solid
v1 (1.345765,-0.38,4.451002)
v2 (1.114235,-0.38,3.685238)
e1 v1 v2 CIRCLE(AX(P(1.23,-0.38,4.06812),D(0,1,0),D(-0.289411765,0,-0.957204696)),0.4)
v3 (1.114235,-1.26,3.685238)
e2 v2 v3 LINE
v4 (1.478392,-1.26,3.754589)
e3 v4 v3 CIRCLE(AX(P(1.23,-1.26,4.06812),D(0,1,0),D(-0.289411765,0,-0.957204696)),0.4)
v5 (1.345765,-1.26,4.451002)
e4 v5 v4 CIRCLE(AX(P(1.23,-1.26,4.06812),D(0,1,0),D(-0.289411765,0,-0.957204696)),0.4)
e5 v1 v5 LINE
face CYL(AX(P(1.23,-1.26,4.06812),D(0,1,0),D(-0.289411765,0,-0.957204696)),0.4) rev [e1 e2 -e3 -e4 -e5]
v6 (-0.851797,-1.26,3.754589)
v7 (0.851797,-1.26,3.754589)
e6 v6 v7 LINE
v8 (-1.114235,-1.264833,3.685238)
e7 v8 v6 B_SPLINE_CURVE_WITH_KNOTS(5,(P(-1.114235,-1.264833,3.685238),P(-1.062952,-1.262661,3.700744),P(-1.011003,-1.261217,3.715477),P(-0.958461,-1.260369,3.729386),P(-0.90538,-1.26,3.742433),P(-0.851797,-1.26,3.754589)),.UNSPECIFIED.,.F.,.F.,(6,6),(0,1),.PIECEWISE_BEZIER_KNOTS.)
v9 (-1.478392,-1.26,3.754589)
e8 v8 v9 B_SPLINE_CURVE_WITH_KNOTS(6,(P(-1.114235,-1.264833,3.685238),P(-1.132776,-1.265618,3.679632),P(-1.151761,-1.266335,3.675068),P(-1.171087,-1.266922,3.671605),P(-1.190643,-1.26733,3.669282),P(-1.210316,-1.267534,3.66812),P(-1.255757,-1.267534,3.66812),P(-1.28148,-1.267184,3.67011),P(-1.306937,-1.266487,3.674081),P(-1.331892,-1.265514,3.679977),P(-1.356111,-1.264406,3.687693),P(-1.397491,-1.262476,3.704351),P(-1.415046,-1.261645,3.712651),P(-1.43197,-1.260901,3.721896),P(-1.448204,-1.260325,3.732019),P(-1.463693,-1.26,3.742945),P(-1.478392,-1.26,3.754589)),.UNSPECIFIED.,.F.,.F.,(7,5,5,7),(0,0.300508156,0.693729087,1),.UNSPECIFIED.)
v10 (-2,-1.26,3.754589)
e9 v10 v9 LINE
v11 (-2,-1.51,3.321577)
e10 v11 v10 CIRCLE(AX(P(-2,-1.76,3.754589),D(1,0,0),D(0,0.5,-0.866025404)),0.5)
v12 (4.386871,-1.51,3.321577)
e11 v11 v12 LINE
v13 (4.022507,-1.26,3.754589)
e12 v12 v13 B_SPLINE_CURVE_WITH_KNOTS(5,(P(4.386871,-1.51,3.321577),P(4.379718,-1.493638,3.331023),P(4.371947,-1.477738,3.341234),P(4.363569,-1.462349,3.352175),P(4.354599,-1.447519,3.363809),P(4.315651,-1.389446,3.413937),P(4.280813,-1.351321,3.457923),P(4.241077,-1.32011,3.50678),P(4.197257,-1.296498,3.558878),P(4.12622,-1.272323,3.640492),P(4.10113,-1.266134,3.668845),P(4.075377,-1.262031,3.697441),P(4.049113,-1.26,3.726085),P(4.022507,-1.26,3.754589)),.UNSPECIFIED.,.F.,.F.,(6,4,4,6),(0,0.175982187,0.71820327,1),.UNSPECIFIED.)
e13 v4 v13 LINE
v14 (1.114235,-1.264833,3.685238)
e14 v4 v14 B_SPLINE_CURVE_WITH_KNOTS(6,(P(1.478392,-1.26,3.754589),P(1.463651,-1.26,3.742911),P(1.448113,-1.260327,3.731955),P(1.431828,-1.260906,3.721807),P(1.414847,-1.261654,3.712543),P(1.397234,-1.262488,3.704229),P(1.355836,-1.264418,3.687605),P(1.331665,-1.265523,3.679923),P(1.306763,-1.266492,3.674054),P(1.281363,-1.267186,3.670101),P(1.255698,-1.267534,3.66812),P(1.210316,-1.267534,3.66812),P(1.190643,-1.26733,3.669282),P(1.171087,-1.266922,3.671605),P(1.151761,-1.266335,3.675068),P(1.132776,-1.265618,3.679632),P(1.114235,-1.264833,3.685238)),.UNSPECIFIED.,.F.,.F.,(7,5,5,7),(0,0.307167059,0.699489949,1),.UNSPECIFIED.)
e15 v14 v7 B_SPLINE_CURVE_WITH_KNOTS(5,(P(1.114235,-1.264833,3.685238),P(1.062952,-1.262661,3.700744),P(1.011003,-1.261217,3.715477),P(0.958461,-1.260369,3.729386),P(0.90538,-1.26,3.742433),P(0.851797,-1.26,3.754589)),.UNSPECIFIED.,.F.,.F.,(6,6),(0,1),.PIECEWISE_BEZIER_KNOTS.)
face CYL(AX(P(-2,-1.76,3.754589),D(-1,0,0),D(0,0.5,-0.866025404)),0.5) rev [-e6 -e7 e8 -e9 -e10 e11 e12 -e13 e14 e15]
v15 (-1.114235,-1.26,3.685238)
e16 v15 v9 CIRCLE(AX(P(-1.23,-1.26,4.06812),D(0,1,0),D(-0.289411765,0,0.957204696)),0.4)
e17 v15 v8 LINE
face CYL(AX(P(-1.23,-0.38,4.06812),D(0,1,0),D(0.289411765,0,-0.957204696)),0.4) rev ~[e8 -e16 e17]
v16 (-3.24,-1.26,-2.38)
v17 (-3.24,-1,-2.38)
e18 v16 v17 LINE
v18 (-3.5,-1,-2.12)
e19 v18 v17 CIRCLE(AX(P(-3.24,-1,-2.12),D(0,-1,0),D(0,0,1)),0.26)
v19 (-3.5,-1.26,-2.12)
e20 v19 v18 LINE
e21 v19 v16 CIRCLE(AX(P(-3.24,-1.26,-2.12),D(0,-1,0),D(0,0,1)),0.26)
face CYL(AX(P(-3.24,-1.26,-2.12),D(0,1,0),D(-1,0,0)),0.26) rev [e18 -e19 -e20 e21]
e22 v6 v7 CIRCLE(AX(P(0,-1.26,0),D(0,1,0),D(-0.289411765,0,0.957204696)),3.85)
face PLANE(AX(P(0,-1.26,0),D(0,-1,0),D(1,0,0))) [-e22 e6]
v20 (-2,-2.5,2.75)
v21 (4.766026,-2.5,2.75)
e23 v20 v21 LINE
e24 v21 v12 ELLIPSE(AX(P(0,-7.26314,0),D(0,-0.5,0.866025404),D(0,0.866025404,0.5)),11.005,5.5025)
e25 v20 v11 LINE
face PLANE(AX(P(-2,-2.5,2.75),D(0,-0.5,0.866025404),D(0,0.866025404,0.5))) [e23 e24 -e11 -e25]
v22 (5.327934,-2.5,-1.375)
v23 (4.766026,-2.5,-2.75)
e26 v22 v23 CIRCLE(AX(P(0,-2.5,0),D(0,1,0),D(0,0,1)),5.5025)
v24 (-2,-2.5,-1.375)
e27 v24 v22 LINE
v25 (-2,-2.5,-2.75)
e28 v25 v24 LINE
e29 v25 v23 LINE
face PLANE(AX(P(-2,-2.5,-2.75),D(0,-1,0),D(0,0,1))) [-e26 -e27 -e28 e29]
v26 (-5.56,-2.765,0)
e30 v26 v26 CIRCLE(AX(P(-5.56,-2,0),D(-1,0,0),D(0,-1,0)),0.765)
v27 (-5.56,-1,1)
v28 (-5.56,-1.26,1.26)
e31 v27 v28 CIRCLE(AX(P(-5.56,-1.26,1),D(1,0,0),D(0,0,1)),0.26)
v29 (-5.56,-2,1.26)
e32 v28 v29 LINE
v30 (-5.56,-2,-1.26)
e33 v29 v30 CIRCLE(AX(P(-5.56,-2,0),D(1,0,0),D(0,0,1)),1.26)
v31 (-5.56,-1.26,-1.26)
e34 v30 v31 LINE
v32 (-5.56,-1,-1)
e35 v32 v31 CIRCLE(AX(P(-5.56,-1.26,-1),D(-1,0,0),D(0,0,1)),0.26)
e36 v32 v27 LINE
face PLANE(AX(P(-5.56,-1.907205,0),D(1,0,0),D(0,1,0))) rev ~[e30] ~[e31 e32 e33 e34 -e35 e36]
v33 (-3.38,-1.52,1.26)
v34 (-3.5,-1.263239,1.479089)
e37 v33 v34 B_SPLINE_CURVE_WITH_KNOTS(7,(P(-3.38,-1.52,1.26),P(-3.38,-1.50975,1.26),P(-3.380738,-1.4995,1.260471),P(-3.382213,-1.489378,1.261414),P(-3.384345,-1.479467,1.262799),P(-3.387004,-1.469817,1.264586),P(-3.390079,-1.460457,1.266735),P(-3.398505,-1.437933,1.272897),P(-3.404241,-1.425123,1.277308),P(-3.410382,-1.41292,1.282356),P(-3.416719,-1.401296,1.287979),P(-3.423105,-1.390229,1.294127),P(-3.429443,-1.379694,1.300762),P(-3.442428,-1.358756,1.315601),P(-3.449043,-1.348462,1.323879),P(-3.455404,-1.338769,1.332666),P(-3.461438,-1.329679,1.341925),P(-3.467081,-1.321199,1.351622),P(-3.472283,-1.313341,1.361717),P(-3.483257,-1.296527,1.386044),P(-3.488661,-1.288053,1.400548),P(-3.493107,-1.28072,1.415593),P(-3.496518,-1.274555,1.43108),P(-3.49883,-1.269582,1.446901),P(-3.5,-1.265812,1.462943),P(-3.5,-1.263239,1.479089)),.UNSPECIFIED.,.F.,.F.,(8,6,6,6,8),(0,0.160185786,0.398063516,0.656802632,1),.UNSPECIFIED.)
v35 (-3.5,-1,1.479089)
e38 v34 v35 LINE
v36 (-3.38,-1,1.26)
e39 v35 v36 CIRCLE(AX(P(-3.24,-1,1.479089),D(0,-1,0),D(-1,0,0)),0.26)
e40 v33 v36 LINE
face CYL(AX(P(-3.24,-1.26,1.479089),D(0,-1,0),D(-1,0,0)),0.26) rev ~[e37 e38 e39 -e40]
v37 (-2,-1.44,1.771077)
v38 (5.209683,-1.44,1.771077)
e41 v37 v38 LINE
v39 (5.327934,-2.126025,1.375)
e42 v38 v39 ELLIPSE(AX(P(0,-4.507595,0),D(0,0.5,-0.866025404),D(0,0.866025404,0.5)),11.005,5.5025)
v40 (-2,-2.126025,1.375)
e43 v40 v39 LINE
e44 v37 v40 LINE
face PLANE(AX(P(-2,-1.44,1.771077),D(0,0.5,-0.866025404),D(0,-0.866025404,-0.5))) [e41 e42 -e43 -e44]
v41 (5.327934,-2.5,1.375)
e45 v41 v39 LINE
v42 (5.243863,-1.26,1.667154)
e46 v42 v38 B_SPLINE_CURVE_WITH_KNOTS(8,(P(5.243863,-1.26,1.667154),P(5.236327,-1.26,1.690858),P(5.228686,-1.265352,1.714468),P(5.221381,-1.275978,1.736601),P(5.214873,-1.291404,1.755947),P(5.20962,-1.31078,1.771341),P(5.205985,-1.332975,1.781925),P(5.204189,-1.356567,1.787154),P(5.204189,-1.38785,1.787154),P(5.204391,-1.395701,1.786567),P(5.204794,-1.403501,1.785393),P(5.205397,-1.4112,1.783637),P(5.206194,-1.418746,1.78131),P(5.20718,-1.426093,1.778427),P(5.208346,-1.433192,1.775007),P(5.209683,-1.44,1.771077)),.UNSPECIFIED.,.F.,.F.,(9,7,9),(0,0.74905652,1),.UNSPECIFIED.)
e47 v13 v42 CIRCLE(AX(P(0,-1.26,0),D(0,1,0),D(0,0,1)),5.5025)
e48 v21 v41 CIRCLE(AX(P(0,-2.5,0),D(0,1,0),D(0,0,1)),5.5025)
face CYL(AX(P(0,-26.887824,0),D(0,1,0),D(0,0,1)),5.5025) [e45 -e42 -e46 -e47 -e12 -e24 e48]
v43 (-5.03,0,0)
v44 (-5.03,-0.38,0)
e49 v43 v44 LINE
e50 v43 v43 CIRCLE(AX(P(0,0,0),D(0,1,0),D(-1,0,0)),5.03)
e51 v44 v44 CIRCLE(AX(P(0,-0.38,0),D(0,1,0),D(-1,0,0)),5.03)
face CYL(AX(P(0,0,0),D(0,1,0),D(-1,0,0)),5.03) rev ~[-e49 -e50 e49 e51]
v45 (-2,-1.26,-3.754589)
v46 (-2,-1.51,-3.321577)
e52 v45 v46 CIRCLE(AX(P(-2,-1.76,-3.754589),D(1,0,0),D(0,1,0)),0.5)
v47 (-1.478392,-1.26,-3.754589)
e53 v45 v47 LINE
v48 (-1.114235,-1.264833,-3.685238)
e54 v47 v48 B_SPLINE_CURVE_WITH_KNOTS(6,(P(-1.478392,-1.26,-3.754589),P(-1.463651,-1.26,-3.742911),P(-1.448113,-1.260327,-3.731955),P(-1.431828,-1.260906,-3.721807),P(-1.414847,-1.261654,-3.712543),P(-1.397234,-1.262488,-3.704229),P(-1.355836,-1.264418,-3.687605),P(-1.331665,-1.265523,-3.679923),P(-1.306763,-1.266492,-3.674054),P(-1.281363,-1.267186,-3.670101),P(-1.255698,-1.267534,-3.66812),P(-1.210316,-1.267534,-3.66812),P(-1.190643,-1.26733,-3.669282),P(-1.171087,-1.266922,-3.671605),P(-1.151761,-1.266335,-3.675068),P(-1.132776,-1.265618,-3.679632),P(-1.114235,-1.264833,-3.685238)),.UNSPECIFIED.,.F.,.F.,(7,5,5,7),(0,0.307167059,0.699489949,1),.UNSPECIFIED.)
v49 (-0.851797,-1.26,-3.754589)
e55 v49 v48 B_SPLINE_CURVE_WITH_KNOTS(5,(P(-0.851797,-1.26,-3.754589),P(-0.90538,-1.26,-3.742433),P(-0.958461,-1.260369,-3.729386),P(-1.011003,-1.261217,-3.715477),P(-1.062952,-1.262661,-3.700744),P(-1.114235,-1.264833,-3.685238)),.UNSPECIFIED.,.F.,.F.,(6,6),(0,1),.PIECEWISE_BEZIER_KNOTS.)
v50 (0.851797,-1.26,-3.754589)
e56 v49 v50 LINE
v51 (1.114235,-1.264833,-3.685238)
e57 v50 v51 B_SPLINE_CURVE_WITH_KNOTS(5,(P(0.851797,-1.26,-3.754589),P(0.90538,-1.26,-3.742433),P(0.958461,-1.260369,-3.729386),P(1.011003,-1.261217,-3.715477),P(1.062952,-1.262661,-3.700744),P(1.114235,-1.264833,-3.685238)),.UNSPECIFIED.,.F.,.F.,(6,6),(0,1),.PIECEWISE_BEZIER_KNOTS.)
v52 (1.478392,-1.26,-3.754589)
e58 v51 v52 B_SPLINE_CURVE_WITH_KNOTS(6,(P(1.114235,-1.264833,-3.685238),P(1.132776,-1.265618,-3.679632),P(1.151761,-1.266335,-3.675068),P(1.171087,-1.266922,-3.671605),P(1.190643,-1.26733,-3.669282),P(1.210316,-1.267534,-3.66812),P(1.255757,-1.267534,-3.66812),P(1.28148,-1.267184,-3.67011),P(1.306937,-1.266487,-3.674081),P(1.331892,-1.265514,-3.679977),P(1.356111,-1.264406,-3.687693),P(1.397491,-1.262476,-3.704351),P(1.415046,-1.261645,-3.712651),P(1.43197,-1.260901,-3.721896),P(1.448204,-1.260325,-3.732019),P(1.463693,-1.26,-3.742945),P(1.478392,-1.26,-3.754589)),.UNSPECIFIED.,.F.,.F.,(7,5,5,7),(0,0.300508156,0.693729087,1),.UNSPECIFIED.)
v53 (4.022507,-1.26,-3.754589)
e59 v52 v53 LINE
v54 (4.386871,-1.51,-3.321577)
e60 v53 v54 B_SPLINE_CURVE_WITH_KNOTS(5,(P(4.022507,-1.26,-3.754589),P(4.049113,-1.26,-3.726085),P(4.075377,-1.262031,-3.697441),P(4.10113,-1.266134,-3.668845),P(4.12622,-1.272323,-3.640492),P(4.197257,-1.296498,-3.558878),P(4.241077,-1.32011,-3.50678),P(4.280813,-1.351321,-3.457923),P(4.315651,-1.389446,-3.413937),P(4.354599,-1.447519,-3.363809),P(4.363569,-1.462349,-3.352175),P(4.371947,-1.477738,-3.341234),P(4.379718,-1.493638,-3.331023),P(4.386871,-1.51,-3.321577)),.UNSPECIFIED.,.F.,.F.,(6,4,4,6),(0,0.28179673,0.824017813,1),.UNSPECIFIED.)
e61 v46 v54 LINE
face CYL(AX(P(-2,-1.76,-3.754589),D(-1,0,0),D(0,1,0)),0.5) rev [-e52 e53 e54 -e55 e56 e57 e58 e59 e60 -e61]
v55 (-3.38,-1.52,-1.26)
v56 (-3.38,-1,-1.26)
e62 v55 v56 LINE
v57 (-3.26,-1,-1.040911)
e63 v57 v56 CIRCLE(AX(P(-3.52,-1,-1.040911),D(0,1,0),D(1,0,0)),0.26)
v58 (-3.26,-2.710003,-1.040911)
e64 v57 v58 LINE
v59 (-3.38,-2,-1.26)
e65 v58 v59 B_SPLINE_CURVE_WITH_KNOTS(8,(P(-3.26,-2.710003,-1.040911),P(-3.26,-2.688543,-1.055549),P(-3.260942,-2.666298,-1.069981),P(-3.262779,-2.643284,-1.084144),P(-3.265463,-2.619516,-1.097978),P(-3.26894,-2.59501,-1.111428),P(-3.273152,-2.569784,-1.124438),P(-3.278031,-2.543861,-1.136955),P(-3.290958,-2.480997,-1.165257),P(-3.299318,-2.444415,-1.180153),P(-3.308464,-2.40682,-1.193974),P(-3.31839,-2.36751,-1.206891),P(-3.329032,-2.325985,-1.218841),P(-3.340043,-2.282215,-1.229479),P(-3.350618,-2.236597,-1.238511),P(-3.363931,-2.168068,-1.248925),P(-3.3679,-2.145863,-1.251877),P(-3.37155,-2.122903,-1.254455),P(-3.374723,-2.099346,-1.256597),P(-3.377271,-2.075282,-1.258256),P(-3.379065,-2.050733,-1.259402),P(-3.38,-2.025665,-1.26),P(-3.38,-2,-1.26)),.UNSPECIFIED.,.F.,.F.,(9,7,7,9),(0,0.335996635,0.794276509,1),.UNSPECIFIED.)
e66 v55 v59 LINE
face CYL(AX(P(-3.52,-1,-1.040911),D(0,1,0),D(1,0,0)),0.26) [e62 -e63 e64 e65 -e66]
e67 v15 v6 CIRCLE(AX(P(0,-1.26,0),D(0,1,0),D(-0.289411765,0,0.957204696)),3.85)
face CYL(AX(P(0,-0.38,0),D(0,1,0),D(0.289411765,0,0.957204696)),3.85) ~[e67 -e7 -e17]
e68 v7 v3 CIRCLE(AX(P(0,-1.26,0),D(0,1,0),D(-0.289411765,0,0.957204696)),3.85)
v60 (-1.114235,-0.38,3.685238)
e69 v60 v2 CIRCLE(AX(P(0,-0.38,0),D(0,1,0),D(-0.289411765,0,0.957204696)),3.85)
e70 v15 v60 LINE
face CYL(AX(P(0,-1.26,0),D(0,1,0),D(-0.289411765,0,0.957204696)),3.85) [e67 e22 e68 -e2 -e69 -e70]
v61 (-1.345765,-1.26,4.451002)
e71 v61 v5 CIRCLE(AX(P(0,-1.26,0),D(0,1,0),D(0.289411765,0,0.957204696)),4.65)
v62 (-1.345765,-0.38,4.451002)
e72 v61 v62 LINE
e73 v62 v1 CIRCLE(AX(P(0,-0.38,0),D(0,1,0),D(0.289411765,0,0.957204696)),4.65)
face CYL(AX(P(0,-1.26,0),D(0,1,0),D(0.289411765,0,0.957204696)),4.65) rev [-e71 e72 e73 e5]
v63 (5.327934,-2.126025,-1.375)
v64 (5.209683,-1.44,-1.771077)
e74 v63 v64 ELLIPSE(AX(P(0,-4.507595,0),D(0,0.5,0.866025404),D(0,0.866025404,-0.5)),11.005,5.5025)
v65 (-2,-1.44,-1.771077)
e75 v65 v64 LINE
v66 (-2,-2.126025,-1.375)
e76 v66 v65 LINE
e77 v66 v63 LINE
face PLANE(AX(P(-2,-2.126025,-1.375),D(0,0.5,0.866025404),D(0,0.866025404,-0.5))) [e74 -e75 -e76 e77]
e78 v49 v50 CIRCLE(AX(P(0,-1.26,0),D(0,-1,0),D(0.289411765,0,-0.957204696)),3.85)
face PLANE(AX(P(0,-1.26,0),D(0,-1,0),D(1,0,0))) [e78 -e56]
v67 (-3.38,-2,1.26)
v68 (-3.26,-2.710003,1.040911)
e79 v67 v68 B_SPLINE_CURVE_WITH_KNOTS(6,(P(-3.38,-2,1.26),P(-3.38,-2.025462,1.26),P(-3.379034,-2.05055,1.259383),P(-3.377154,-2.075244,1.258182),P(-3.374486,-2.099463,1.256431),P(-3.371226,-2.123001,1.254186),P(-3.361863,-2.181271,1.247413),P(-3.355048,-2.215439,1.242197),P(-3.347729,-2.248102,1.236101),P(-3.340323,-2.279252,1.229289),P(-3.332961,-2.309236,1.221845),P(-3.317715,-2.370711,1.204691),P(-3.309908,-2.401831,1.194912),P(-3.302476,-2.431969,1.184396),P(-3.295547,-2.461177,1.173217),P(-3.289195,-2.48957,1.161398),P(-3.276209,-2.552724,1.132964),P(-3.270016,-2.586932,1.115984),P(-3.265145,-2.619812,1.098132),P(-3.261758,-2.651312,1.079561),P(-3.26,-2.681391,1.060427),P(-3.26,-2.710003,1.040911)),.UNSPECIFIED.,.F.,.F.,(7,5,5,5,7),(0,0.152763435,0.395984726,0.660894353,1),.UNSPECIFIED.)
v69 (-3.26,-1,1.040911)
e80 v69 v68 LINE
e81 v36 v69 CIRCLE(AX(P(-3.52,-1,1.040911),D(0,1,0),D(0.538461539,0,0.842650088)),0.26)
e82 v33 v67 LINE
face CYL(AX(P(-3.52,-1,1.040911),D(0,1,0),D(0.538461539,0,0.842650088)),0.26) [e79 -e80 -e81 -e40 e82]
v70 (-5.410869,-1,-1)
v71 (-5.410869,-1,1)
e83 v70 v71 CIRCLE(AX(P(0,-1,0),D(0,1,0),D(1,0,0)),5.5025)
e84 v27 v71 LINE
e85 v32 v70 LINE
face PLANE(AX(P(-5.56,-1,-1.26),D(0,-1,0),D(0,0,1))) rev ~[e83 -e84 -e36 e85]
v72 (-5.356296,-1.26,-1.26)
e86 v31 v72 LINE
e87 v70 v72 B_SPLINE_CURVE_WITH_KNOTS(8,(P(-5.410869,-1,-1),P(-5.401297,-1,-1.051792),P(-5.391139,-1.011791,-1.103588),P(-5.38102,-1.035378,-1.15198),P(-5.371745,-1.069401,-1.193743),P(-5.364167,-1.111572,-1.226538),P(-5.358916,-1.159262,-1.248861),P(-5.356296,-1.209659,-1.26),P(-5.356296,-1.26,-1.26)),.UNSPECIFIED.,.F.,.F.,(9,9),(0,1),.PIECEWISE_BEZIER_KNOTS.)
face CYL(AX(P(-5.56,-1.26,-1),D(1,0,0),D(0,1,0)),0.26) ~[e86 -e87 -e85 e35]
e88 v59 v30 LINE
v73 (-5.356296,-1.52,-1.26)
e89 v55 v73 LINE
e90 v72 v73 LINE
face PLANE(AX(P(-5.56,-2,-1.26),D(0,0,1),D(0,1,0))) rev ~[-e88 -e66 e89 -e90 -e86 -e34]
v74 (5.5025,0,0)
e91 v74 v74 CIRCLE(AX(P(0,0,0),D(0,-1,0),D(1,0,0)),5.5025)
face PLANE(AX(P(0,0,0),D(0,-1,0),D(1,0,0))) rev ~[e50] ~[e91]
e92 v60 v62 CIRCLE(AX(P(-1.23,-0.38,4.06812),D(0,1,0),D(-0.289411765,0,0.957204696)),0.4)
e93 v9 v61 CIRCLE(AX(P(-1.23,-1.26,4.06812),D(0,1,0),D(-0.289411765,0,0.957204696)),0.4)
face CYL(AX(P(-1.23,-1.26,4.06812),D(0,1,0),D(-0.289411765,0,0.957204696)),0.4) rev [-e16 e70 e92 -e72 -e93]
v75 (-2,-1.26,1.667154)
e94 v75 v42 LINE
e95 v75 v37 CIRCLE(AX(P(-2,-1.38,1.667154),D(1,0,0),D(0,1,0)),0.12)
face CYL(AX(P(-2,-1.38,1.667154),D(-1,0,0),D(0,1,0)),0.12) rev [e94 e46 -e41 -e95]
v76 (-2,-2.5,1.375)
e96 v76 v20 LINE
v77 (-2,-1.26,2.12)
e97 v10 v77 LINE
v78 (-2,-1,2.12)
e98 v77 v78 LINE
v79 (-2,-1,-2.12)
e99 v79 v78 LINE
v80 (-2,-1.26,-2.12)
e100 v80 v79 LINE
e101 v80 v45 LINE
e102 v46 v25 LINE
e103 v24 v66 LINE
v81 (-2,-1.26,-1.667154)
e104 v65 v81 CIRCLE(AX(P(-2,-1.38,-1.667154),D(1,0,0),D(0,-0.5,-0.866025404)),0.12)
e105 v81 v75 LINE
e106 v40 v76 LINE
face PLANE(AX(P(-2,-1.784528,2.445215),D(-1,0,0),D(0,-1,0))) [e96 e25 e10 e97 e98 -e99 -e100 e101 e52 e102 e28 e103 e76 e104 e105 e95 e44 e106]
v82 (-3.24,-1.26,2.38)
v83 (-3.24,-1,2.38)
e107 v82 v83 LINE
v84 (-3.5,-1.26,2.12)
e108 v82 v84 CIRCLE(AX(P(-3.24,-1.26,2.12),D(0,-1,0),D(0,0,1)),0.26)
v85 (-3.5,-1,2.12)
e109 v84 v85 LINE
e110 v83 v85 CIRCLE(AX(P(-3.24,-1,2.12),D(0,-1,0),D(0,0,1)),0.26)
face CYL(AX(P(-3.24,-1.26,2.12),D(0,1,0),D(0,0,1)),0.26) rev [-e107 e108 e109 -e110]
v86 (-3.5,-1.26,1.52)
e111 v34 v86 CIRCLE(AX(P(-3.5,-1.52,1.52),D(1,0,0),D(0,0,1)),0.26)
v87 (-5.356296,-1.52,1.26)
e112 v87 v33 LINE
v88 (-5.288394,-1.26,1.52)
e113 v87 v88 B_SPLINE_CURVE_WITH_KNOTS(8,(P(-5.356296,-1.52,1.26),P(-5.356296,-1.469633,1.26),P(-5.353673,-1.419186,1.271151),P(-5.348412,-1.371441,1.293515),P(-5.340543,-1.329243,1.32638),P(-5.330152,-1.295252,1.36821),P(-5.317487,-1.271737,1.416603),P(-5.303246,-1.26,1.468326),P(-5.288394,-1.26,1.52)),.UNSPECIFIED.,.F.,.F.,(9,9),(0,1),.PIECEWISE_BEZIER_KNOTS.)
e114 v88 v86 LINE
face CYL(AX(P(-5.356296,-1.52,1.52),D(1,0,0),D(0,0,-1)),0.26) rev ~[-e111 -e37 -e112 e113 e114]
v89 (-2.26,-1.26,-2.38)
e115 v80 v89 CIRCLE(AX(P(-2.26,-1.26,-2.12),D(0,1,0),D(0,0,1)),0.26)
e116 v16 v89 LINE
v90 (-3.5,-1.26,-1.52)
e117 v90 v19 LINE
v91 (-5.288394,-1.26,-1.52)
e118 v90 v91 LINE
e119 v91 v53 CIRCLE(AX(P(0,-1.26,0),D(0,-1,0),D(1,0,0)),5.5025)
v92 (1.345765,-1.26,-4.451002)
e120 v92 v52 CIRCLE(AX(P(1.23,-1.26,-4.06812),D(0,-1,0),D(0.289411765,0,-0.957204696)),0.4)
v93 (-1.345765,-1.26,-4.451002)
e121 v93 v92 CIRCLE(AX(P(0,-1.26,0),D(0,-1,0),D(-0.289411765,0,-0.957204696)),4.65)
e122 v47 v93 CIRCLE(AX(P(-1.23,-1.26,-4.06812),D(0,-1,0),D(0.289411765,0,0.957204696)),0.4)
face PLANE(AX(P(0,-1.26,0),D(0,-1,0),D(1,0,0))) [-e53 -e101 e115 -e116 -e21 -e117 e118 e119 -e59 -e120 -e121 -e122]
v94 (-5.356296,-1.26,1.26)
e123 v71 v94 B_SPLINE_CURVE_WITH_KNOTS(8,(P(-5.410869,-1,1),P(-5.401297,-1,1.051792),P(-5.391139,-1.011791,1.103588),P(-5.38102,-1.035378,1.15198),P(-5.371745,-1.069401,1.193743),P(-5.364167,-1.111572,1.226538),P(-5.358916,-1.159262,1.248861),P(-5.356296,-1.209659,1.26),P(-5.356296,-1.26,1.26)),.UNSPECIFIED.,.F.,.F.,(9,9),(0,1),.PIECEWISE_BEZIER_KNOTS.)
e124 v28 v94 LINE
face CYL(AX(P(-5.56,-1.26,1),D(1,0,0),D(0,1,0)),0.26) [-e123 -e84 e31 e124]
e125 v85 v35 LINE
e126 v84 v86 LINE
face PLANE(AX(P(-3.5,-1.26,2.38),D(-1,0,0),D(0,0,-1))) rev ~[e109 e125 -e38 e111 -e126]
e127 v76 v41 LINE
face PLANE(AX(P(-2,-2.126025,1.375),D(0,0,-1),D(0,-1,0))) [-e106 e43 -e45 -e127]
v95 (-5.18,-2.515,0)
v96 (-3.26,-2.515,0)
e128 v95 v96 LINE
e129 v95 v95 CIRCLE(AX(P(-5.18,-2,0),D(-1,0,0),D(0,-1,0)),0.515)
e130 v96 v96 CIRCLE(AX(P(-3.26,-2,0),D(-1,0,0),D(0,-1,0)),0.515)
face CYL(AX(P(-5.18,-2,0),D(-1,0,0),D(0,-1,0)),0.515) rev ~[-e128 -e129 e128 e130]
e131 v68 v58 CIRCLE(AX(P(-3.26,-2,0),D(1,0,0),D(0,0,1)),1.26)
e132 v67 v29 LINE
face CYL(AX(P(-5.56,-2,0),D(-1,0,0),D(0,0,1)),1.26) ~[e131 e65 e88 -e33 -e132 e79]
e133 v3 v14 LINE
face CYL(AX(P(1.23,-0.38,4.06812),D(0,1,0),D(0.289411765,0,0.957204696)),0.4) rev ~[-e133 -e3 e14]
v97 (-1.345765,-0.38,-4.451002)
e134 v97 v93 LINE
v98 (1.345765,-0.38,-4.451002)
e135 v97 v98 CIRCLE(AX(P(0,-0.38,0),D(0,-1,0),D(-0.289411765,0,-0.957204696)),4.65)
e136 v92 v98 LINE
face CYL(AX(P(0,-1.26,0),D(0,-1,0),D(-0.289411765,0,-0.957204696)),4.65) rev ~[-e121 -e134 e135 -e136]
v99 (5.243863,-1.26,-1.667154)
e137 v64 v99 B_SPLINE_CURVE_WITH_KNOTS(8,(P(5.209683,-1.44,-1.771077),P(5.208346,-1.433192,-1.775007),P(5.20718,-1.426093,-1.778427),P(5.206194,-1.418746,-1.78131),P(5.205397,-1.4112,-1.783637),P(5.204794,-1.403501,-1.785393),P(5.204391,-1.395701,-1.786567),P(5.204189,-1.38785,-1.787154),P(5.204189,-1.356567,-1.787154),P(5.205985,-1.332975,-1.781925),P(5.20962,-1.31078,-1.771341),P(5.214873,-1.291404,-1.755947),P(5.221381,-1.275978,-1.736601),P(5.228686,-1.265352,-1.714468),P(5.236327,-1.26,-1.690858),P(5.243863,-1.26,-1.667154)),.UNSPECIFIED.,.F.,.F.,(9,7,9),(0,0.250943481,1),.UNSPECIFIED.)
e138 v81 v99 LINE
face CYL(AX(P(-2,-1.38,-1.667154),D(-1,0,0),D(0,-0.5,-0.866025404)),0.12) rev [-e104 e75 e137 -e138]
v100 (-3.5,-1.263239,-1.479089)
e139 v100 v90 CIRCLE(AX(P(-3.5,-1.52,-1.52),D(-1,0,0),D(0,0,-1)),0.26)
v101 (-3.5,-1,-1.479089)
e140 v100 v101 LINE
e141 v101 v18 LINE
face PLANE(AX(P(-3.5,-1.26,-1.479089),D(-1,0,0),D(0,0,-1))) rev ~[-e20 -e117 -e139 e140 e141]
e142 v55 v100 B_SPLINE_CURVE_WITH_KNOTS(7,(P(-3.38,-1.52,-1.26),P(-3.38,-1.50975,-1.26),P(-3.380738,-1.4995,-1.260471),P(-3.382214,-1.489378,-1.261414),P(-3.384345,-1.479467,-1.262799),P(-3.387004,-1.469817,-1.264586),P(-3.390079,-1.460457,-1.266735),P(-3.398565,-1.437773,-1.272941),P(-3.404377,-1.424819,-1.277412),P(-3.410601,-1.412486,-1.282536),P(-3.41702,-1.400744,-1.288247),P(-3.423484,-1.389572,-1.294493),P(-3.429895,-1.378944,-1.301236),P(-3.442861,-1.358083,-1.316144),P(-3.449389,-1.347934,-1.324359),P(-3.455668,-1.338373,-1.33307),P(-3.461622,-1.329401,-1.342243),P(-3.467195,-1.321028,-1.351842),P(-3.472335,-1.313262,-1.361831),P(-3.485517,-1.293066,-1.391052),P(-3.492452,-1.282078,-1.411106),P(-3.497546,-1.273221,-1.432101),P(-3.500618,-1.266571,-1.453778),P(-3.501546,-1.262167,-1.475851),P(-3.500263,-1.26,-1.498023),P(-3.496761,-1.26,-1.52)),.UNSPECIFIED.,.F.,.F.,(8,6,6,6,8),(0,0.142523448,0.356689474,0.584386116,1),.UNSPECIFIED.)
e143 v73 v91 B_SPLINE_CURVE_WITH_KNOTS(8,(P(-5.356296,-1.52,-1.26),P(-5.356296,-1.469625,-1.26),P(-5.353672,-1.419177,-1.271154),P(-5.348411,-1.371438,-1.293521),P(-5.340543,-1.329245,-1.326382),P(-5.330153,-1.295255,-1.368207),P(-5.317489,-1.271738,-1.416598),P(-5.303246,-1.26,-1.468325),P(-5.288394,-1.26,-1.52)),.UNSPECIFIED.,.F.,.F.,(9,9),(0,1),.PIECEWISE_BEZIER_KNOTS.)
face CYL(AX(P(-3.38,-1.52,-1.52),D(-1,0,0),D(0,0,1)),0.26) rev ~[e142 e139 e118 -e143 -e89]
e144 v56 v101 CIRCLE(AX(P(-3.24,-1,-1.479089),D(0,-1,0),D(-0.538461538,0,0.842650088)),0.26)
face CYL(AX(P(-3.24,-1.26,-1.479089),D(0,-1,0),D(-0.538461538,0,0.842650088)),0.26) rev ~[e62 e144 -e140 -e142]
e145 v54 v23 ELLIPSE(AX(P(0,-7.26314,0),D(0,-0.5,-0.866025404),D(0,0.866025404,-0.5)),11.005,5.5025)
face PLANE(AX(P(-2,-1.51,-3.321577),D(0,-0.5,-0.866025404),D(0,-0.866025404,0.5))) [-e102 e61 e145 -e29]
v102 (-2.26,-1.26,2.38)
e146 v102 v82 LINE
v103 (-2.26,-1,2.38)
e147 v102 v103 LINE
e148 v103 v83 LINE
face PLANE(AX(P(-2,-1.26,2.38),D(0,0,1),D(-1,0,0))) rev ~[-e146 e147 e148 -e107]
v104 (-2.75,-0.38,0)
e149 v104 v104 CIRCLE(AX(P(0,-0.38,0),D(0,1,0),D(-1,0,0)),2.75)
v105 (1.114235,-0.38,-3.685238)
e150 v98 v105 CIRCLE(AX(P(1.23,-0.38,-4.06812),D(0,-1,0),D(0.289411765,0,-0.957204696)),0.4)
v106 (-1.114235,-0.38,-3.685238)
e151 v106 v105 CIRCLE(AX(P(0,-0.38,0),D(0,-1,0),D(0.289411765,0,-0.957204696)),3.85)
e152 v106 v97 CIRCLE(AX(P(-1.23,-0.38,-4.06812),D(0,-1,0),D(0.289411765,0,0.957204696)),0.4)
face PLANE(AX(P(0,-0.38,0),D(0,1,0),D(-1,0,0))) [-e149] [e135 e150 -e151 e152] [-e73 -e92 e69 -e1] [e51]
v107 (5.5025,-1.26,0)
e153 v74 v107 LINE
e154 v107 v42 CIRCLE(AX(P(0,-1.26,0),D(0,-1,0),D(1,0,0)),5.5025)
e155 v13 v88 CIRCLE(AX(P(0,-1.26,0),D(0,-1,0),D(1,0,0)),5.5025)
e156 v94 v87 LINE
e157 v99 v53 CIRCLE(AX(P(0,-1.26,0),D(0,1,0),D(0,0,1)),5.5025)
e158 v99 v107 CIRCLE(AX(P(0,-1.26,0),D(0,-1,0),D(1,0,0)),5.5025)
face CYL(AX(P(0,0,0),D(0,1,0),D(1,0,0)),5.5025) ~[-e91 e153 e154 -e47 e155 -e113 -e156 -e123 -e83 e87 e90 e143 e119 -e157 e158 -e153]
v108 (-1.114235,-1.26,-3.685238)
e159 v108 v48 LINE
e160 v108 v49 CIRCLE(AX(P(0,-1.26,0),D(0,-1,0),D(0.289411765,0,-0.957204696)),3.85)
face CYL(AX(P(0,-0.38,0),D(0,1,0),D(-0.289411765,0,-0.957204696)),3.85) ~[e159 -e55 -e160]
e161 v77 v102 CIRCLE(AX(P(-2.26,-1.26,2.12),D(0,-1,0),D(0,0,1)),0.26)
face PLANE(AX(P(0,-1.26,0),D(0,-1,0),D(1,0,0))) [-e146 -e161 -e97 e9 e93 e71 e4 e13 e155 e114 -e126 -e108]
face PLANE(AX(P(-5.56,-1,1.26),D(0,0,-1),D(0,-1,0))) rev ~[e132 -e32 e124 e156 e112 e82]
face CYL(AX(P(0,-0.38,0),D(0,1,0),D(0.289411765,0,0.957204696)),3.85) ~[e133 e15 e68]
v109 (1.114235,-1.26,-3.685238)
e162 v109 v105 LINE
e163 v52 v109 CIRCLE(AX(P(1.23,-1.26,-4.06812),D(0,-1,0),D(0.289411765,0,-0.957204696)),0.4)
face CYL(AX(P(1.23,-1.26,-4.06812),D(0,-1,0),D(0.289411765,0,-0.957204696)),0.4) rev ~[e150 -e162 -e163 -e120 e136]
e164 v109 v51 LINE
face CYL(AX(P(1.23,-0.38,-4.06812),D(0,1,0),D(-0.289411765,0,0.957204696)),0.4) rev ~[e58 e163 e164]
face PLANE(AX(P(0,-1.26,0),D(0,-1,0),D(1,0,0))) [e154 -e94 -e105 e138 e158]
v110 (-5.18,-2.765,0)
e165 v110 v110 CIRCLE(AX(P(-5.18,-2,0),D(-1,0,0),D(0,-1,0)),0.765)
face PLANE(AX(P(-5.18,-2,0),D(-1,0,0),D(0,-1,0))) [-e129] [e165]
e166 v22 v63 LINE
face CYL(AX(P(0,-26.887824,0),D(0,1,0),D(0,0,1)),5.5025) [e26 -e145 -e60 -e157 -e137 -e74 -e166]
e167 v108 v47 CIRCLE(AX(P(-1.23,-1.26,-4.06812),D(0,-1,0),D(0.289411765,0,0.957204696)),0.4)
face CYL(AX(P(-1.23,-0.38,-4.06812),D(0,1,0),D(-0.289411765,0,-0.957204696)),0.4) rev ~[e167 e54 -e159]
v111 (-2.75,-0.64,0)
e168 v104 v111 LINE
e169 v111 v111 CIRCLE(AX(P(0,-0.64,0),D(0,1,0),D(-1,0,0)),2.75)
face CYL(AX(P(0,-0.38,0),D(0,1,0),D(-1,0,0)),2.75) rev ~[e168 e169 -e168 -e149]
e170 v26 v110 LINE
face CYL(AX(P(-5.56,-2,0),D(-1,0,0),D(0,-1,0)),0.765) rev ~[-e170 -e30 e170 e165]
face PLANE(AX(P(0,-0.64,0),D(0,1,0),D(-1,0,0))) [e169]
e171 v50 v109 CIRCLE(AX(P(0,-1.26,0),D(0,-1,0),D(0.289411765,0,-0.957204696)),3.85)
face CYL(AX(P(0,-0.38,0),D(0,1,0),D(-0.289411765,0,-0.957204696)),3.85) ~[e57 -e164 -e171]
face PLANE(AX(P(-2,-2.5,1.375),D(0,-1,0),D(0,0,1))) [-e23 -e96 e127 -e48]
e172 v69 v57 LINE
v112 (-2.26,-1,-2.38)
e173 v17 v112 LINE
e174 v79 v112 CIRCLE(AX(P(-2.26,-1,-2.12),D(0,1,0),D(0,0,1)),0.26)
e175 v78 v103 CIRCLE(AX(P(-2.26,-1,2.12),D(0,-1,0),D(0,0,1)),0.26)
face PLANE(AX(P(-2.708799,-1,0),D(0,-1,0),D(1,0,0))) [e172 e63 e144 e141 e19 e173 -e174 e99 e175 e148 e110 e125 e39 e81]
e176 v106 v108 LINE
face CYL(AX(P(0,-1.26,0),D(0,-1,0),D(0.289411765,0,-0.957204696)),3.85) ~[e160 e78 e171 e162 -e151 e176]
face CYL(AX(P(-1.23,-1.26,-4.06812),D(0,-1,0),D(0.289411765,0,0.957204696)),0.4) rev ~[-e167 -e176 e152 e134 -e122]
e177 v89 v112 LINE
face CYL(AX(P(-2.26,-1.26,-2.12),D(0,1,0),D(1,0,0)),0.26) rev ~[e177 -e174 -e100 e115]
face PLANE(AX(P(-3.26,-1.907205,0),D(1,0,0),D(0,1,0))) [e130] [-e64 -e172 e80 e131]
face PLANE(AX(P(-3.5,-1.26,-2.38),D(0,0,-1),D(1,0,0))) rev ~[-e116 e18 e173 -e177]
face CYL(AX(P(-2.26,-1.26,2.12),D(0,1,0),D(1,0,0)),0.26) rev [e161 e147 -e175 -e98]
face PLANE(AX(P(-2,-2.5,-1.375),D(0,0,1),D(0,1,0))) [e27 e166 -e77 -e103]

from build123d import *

# Parameters (mm, degrees)
F0_R           = 5.5025
F1_DEPTH       = 1.26
F2_R           = 5.03
F3_DEPTH       = 0.38
F4_R           = 2.75
F5_DEPTH       = 0.26
F7_DEPTH       = 7.5
F9_DEPTH       = 0.26
F10_R          = 0.26
F13_DEPTH      = 2.3
F14_R          = 0.765
F15_DEPTH      = 0.38
F16_R          = 0.515
F17_DEPTH      = 10.6835
F18_DEPTH      = 1.5
F19_F1_R       = 0.26
F19_F2_R       = 0.26
F21_DEPTH      = 15
F23_END_RADIUS = 5.5025
F23_REACH      = 10.1867902517
F25_DEPTH      = 10


# Not quite as in the source:
# - after a boolean that leaves OpenCascade's solid faulty, fix() repairs it


with BuildPart() as f1:
    # F0 (on Front) → F1 (new body)
    with BuildSketch(Plane.XZ):
        Circle(F0_R)
    extrude(amount=F1_DEPTH)

    # F2 (on face) → F3 (cut)
    with BuildSketch(Plane(origin=(0, 0, 0), x_dir=(-1, 0, 0), z_dir=(0, 1, 0))):
        Circle(F2_R)
    extrude(amount=-F3_DEPTH, mode=Mode.SUBTRACT)

    # F4 (on face) → F5 (cut)
    with BuildSketch(Plane(origin=(0, -0.38, 0), x_dir=(-1, 0, 0), z_dir=(0, 1, 0))):
        Circle(F4_R)
    extrude(amount=-F5_DEPTH, mode=Mode.SUBTRACT)

    # F6 (on face) → F7 (cut, symmetric)
    with BuildSketch(Plane.XZ.offset(1.26)):
        with BuildLine():
            ThreePointArc((-1.1142352941, 3.6852380804), (0, 3.85), (1.1142352941, 3.6852380804))
            ThreePointArc((1.1142352941, 3.6852380804), (1.6128818785, 3.952355253), (1.3457647059, 4.4510018374))
            ThreePointArc((1.3457647059, 4.4510018374), (0, 4.65), (-1.3457647059, 4.4510018374))
            ThreePointArc((-1.3457647059, 4.4510018374), (-1.6128818785, 3.952355253), (-1.1142352941, 3.6852380804))
        make_face()
        with BuildLine():
            ThreePointArc((1.1142352941, -3.6852380804), (0, -3.85), (-1.1142352941, -3.6852380804))
            ThreePointArc((-1.1142352941, -3.6852380804), (-1.6128818785, -3.952355253), (-1.3457647059, -4.4510018374))
            ThreePointArc((-1.3457647059, -4.4510018374), (0, -4.65), (1.3457647059, -4.4510018374))
            ThreePointArc((1.3457647059, -4.4510018374), (1.6128818785, -3.952355253), (1.1142352941, -3.6852380804))
        make_face()
    extrude(amount=F7_DEPTH, both=True, mode=Mode.SUBTRACT)

    # F8 (on face) → F9 (cut)
    with BuildSketch(Plane.XZ.offset(1.26)):
        with BuildLine():
            Line((-2, -2.38), (-2, 2.38))
            Line((-2, 2.38), (-3.5, 2.38))
            Line((-3.5, 2.38), (-3.5, 1.479089023))
            ThreePointArc((-3.5, 1.479089023), (-3.468035085, 1.354189063), (-3.38, 1.26))
            ThreePointArc((-3.38, 1.26), (-3.291964915, 1.165810937), (-3.26, 1.040910977))
            Line((-3.26, 1.040910977), (-3.26, -1.040910977))
            ThreePointArc((-3.26, -1.040910977), (-3.291964915, -1.165810937), (-3.38, -1.26))
            ThreePointArc((-3.38, -1.26), (-3.468035085, -1.354189063), (-3.5, -1.479089023))
            Line((-3.5, -1.479089023), (-3.5, -2.38))
            Line((-3.5, -2.38), (-2, -2.38))
        make_face()
    extrude(amount=-F9_DEPTH, mode=Mode.SUBTRACT)

    # F10
    f10_edges = [f1.edges().sort_by_distance(p)[0] for p in [
        (-2, -1.13, 2.38),
        (-3.5, -1.13, 2.38),
        (-3.5, -1.13, -2.38),
        (-2, -1.13, -2.38),
    ]]
    fillet(f10_edges, radius=F10_R)

    # F12 (on offset) → F13 (join, through all)
    with BuildSketch(Plane.YZ.offset(-5.56)):
        with BuildLine():
            Line((-1, -1.26), (-1, 1.26))
            Line((-1, 1.26), (-2, 1.26))
            ThreePointArc((-2, 1.26), (-3.26, 0), (-2, -1.26))
            Line((-2, -1.26), (-1, -1.26))
        make_face()
    extrude(amount=F13_DEPTH)

    # F14 (on face) → F15 (cut)
    with BuildSketch(Plane(origin=(-5.56, 0, 0), x_dir=(0, -1, 0), z_dir=(-1, 0, 0))):
        with Locations((2, 0)):
            Circle(F14_R)
    extrude(amount=-F15_DEPTH, mode=Mode.SUBTRACT)

    # F16 (on face) → F17 (cut, through all)
    with BuildSketch(Plane(origin=(-5.18, 0, 0), x_dir=(0, -1, 0), z_dir=(-1, 0, 0))):
        with Locations((2, 0)):
            Circle(F16_R)
    extrude(amount=-F17_DEPTH, mode=Mode.SUBTRACT)

    # F18 (cut): a face of the model
    f18_faces = [f1.faces().sort_by_distance(p)[0] for p in [
        (-2.6893148123, -1, 0),
    ]]
    extrude(f18_faces, amount=F18_DEPTH, mode=Mode.SUBTRACT)

    # F19: fillet of radius 0.26 on 4 edges, made by hand

    # F19_f1
    f19_f1_edges = [f1.edges().sort_by_distance(p)[0] for p in [
        (-5.4581479725, -1, 1.26),
        (-5.4581479725, -1, -1.26),
    ]]
    fillet(f19_f1_edges, radius=F19_F1_R)

    # F19_f2
    f19_f2_edges = [f1.edges().sort_by_distance(p)[0] for p in [
        (-4.3681479725, -1.26, 1.26),
        (-4.3681479725, -1.26, -1.26),
    ]]
    fillet(f19_f2_edges, radius=F19_F2_R)

    # F20 (on face) → F21 (cut)
    with BuildSketch(Plane.XZ.offset(1)):
        with BuildLine():
            ThreePointArc((-2.26, -2.38), (-2.0761522369, -2.3038477631), (-2, -2.12))
            Line((-2, -2.12), (-2, 2.12))
            ThreePointArc((-2, 2.12), (-2.0761522369, 2.3038477631), (-2.26, 2.38))
            Line((-2.26, 2.38), (-3.24, 2.38))
            ThreePointArc((-3.24, 2.38), (-3.4238477631, 2.3038477631), (-3.5, 2.12))
            Line((-3.5, 2.12), (-3.5, 1.479089023))
            ThreePointArc((-3.5, 1.479089023), (-3.468035085, 1.354189063), (-3.38, 1.26))
            ThreePointArc((-3.38, 1.26), (-3.2919649151, 1.165810937), (-3.2600000001, 1.0409109771))
            Line((-3.2600000001, 1.0409109771), (-3.2599999999, -1.0409109769))
            ThreePointArc((-3.2599999999, -1.0409109769), (-3.2919649149, -1.1658109369), (-3.38, -1.26))
            ThreePointArc((-3.38, -1.26), (-3.468035085, -1.354189063), (-3.5, -1.479089023))
            Line((-3.5, -1.479089023), (-3.5, -2.12))
            ThreePointArc((-3.5, -2.12), (-3.4238477631, -2.3038477631), (-3.24, -2.38))
            Line((-3.24, -2.38), (-2.26, -2.38))
        make_face()
    extrude(amount=F21_DEPTH, mode=Mode.SUBTRACT)

    f23_end = (Plane.ZX.offset(-0.76) * Cylinder(F23_END_RADIUS, 52.2556470224, mode=Mode.PRIVATE)).faces().sort_by_distance((-5.5025, -0.76, 0))[0]
    # F22 (on face) → F23 (join, up to the whole of a round face its end follows)
    with BuildSketch(Plane(origin=(-2, 0, 0), x_dir=(0, -1, 0), z_dir=(-1, 0, 0))):
        with BuildLine():
            Line((2.5, 2.75), (1.51, 3.3215767665))
            ThreePointArc((1.51, 3.3215767665), (1.3269872981, 3.5045894684), (1.26, 3.7545894684))
            Line((1.26, 3.7545894684), (1.26, 1.875))
            Line((1.26, 1.875), (1.26, 1.6671539031))
            ThreePointArc((1.26, 1.6671539031), (1.32, 1.7710769515), (1.44, 1.7710769515))
            Line((1.44, 1.7710769515), (2.1260254038, 1.375))
            Line((2.1260254038, 1.375), (2.5, 1.375))
            Line((2.5, 1.375), (2.5, 2.75))
        make_face()
        with BuildLine():
            ThreePointArc((1.26, -3.7545894684), (1.3269872981, -3.5045894684), (1.51, -3.3215767665))
            Line((1.51, -3.3215767665), (2.5, -2.75))
            Line((2.5, -2.75), (2.5, -1.375))
            Line((2.5, -1.375), (2.1260254038, -1.375))
            Line((2.1260254038, -1.375), (1.44, -1.7710769515))
            ThreePointArc((1.44, -1.7710769515), (1.32, -1.7710769515), (1.26, -1.6671539031))
            Line((1.26, -1.6671539031), (1.26, -1.875))
            Line((1.26, -1.875), (1.26, -3.7545894684))
        make_face()
    f23_long = extrude(amount=-F23_REACH, mode=Mode.PRIVATE)
    add(split(f23_long, bisect_by=f23_end, keep=Keep.BOTTOM, mode=Mode.PRIVATE))

    add(f1.part.fix(), mode=Mode.REPLACE)

    # F24 (on face) → F25 (cut)
    with BuildSketch(Plane(origin=(0, -0.38, 0), x_dir=(-1, 0, 0), z_dir=(0, 1, 0))):
        with BuildLine():
            ThreePointArc((-1.1142352941, -3.6852380804), (-1.6128818785, -3.952355253), (-1.3457647059, -4.4510018374))
            ThreePointArc((-1.3457647059, -4.4510018374), (0, -4.65), (1.3457647059, -4.4510018374))
            ThreePointArc((1.3457647059, -4.4510018374), (1.6128818785, -3.952355253), (1.1142352941, -3.6852380804))
            ThreePointArc((1.1142352941, -3.6852380804), (0, -3.85), (-1.1142352941, -3.6852380804))
        make_face()
        with BuildLine():
            ThreePointArc((-1.1142352941, 3.6852380804), (0, 3.85), (1.1142352941, 3.6852380804))
            ThreePointArc((1.1142352941, 3.6852380804), (1.6128818785, 3.952355253), (1.3457647059, 4.4510018374))
            ThreePointArc((1.3457647059, 4.4510018374), (0, 4.65), (-1.3457647059, 4.4510018374))
            ThreePointArc((-1.3457647059, 4.4510018374), (-1.6128818785, 3.952355253), (-1.1142352941, 3.6852380804))
        make_face()
    extrude(amount=-F25_DEPTH, mode=Mode.SUBTRACT)


solid = f1.part
